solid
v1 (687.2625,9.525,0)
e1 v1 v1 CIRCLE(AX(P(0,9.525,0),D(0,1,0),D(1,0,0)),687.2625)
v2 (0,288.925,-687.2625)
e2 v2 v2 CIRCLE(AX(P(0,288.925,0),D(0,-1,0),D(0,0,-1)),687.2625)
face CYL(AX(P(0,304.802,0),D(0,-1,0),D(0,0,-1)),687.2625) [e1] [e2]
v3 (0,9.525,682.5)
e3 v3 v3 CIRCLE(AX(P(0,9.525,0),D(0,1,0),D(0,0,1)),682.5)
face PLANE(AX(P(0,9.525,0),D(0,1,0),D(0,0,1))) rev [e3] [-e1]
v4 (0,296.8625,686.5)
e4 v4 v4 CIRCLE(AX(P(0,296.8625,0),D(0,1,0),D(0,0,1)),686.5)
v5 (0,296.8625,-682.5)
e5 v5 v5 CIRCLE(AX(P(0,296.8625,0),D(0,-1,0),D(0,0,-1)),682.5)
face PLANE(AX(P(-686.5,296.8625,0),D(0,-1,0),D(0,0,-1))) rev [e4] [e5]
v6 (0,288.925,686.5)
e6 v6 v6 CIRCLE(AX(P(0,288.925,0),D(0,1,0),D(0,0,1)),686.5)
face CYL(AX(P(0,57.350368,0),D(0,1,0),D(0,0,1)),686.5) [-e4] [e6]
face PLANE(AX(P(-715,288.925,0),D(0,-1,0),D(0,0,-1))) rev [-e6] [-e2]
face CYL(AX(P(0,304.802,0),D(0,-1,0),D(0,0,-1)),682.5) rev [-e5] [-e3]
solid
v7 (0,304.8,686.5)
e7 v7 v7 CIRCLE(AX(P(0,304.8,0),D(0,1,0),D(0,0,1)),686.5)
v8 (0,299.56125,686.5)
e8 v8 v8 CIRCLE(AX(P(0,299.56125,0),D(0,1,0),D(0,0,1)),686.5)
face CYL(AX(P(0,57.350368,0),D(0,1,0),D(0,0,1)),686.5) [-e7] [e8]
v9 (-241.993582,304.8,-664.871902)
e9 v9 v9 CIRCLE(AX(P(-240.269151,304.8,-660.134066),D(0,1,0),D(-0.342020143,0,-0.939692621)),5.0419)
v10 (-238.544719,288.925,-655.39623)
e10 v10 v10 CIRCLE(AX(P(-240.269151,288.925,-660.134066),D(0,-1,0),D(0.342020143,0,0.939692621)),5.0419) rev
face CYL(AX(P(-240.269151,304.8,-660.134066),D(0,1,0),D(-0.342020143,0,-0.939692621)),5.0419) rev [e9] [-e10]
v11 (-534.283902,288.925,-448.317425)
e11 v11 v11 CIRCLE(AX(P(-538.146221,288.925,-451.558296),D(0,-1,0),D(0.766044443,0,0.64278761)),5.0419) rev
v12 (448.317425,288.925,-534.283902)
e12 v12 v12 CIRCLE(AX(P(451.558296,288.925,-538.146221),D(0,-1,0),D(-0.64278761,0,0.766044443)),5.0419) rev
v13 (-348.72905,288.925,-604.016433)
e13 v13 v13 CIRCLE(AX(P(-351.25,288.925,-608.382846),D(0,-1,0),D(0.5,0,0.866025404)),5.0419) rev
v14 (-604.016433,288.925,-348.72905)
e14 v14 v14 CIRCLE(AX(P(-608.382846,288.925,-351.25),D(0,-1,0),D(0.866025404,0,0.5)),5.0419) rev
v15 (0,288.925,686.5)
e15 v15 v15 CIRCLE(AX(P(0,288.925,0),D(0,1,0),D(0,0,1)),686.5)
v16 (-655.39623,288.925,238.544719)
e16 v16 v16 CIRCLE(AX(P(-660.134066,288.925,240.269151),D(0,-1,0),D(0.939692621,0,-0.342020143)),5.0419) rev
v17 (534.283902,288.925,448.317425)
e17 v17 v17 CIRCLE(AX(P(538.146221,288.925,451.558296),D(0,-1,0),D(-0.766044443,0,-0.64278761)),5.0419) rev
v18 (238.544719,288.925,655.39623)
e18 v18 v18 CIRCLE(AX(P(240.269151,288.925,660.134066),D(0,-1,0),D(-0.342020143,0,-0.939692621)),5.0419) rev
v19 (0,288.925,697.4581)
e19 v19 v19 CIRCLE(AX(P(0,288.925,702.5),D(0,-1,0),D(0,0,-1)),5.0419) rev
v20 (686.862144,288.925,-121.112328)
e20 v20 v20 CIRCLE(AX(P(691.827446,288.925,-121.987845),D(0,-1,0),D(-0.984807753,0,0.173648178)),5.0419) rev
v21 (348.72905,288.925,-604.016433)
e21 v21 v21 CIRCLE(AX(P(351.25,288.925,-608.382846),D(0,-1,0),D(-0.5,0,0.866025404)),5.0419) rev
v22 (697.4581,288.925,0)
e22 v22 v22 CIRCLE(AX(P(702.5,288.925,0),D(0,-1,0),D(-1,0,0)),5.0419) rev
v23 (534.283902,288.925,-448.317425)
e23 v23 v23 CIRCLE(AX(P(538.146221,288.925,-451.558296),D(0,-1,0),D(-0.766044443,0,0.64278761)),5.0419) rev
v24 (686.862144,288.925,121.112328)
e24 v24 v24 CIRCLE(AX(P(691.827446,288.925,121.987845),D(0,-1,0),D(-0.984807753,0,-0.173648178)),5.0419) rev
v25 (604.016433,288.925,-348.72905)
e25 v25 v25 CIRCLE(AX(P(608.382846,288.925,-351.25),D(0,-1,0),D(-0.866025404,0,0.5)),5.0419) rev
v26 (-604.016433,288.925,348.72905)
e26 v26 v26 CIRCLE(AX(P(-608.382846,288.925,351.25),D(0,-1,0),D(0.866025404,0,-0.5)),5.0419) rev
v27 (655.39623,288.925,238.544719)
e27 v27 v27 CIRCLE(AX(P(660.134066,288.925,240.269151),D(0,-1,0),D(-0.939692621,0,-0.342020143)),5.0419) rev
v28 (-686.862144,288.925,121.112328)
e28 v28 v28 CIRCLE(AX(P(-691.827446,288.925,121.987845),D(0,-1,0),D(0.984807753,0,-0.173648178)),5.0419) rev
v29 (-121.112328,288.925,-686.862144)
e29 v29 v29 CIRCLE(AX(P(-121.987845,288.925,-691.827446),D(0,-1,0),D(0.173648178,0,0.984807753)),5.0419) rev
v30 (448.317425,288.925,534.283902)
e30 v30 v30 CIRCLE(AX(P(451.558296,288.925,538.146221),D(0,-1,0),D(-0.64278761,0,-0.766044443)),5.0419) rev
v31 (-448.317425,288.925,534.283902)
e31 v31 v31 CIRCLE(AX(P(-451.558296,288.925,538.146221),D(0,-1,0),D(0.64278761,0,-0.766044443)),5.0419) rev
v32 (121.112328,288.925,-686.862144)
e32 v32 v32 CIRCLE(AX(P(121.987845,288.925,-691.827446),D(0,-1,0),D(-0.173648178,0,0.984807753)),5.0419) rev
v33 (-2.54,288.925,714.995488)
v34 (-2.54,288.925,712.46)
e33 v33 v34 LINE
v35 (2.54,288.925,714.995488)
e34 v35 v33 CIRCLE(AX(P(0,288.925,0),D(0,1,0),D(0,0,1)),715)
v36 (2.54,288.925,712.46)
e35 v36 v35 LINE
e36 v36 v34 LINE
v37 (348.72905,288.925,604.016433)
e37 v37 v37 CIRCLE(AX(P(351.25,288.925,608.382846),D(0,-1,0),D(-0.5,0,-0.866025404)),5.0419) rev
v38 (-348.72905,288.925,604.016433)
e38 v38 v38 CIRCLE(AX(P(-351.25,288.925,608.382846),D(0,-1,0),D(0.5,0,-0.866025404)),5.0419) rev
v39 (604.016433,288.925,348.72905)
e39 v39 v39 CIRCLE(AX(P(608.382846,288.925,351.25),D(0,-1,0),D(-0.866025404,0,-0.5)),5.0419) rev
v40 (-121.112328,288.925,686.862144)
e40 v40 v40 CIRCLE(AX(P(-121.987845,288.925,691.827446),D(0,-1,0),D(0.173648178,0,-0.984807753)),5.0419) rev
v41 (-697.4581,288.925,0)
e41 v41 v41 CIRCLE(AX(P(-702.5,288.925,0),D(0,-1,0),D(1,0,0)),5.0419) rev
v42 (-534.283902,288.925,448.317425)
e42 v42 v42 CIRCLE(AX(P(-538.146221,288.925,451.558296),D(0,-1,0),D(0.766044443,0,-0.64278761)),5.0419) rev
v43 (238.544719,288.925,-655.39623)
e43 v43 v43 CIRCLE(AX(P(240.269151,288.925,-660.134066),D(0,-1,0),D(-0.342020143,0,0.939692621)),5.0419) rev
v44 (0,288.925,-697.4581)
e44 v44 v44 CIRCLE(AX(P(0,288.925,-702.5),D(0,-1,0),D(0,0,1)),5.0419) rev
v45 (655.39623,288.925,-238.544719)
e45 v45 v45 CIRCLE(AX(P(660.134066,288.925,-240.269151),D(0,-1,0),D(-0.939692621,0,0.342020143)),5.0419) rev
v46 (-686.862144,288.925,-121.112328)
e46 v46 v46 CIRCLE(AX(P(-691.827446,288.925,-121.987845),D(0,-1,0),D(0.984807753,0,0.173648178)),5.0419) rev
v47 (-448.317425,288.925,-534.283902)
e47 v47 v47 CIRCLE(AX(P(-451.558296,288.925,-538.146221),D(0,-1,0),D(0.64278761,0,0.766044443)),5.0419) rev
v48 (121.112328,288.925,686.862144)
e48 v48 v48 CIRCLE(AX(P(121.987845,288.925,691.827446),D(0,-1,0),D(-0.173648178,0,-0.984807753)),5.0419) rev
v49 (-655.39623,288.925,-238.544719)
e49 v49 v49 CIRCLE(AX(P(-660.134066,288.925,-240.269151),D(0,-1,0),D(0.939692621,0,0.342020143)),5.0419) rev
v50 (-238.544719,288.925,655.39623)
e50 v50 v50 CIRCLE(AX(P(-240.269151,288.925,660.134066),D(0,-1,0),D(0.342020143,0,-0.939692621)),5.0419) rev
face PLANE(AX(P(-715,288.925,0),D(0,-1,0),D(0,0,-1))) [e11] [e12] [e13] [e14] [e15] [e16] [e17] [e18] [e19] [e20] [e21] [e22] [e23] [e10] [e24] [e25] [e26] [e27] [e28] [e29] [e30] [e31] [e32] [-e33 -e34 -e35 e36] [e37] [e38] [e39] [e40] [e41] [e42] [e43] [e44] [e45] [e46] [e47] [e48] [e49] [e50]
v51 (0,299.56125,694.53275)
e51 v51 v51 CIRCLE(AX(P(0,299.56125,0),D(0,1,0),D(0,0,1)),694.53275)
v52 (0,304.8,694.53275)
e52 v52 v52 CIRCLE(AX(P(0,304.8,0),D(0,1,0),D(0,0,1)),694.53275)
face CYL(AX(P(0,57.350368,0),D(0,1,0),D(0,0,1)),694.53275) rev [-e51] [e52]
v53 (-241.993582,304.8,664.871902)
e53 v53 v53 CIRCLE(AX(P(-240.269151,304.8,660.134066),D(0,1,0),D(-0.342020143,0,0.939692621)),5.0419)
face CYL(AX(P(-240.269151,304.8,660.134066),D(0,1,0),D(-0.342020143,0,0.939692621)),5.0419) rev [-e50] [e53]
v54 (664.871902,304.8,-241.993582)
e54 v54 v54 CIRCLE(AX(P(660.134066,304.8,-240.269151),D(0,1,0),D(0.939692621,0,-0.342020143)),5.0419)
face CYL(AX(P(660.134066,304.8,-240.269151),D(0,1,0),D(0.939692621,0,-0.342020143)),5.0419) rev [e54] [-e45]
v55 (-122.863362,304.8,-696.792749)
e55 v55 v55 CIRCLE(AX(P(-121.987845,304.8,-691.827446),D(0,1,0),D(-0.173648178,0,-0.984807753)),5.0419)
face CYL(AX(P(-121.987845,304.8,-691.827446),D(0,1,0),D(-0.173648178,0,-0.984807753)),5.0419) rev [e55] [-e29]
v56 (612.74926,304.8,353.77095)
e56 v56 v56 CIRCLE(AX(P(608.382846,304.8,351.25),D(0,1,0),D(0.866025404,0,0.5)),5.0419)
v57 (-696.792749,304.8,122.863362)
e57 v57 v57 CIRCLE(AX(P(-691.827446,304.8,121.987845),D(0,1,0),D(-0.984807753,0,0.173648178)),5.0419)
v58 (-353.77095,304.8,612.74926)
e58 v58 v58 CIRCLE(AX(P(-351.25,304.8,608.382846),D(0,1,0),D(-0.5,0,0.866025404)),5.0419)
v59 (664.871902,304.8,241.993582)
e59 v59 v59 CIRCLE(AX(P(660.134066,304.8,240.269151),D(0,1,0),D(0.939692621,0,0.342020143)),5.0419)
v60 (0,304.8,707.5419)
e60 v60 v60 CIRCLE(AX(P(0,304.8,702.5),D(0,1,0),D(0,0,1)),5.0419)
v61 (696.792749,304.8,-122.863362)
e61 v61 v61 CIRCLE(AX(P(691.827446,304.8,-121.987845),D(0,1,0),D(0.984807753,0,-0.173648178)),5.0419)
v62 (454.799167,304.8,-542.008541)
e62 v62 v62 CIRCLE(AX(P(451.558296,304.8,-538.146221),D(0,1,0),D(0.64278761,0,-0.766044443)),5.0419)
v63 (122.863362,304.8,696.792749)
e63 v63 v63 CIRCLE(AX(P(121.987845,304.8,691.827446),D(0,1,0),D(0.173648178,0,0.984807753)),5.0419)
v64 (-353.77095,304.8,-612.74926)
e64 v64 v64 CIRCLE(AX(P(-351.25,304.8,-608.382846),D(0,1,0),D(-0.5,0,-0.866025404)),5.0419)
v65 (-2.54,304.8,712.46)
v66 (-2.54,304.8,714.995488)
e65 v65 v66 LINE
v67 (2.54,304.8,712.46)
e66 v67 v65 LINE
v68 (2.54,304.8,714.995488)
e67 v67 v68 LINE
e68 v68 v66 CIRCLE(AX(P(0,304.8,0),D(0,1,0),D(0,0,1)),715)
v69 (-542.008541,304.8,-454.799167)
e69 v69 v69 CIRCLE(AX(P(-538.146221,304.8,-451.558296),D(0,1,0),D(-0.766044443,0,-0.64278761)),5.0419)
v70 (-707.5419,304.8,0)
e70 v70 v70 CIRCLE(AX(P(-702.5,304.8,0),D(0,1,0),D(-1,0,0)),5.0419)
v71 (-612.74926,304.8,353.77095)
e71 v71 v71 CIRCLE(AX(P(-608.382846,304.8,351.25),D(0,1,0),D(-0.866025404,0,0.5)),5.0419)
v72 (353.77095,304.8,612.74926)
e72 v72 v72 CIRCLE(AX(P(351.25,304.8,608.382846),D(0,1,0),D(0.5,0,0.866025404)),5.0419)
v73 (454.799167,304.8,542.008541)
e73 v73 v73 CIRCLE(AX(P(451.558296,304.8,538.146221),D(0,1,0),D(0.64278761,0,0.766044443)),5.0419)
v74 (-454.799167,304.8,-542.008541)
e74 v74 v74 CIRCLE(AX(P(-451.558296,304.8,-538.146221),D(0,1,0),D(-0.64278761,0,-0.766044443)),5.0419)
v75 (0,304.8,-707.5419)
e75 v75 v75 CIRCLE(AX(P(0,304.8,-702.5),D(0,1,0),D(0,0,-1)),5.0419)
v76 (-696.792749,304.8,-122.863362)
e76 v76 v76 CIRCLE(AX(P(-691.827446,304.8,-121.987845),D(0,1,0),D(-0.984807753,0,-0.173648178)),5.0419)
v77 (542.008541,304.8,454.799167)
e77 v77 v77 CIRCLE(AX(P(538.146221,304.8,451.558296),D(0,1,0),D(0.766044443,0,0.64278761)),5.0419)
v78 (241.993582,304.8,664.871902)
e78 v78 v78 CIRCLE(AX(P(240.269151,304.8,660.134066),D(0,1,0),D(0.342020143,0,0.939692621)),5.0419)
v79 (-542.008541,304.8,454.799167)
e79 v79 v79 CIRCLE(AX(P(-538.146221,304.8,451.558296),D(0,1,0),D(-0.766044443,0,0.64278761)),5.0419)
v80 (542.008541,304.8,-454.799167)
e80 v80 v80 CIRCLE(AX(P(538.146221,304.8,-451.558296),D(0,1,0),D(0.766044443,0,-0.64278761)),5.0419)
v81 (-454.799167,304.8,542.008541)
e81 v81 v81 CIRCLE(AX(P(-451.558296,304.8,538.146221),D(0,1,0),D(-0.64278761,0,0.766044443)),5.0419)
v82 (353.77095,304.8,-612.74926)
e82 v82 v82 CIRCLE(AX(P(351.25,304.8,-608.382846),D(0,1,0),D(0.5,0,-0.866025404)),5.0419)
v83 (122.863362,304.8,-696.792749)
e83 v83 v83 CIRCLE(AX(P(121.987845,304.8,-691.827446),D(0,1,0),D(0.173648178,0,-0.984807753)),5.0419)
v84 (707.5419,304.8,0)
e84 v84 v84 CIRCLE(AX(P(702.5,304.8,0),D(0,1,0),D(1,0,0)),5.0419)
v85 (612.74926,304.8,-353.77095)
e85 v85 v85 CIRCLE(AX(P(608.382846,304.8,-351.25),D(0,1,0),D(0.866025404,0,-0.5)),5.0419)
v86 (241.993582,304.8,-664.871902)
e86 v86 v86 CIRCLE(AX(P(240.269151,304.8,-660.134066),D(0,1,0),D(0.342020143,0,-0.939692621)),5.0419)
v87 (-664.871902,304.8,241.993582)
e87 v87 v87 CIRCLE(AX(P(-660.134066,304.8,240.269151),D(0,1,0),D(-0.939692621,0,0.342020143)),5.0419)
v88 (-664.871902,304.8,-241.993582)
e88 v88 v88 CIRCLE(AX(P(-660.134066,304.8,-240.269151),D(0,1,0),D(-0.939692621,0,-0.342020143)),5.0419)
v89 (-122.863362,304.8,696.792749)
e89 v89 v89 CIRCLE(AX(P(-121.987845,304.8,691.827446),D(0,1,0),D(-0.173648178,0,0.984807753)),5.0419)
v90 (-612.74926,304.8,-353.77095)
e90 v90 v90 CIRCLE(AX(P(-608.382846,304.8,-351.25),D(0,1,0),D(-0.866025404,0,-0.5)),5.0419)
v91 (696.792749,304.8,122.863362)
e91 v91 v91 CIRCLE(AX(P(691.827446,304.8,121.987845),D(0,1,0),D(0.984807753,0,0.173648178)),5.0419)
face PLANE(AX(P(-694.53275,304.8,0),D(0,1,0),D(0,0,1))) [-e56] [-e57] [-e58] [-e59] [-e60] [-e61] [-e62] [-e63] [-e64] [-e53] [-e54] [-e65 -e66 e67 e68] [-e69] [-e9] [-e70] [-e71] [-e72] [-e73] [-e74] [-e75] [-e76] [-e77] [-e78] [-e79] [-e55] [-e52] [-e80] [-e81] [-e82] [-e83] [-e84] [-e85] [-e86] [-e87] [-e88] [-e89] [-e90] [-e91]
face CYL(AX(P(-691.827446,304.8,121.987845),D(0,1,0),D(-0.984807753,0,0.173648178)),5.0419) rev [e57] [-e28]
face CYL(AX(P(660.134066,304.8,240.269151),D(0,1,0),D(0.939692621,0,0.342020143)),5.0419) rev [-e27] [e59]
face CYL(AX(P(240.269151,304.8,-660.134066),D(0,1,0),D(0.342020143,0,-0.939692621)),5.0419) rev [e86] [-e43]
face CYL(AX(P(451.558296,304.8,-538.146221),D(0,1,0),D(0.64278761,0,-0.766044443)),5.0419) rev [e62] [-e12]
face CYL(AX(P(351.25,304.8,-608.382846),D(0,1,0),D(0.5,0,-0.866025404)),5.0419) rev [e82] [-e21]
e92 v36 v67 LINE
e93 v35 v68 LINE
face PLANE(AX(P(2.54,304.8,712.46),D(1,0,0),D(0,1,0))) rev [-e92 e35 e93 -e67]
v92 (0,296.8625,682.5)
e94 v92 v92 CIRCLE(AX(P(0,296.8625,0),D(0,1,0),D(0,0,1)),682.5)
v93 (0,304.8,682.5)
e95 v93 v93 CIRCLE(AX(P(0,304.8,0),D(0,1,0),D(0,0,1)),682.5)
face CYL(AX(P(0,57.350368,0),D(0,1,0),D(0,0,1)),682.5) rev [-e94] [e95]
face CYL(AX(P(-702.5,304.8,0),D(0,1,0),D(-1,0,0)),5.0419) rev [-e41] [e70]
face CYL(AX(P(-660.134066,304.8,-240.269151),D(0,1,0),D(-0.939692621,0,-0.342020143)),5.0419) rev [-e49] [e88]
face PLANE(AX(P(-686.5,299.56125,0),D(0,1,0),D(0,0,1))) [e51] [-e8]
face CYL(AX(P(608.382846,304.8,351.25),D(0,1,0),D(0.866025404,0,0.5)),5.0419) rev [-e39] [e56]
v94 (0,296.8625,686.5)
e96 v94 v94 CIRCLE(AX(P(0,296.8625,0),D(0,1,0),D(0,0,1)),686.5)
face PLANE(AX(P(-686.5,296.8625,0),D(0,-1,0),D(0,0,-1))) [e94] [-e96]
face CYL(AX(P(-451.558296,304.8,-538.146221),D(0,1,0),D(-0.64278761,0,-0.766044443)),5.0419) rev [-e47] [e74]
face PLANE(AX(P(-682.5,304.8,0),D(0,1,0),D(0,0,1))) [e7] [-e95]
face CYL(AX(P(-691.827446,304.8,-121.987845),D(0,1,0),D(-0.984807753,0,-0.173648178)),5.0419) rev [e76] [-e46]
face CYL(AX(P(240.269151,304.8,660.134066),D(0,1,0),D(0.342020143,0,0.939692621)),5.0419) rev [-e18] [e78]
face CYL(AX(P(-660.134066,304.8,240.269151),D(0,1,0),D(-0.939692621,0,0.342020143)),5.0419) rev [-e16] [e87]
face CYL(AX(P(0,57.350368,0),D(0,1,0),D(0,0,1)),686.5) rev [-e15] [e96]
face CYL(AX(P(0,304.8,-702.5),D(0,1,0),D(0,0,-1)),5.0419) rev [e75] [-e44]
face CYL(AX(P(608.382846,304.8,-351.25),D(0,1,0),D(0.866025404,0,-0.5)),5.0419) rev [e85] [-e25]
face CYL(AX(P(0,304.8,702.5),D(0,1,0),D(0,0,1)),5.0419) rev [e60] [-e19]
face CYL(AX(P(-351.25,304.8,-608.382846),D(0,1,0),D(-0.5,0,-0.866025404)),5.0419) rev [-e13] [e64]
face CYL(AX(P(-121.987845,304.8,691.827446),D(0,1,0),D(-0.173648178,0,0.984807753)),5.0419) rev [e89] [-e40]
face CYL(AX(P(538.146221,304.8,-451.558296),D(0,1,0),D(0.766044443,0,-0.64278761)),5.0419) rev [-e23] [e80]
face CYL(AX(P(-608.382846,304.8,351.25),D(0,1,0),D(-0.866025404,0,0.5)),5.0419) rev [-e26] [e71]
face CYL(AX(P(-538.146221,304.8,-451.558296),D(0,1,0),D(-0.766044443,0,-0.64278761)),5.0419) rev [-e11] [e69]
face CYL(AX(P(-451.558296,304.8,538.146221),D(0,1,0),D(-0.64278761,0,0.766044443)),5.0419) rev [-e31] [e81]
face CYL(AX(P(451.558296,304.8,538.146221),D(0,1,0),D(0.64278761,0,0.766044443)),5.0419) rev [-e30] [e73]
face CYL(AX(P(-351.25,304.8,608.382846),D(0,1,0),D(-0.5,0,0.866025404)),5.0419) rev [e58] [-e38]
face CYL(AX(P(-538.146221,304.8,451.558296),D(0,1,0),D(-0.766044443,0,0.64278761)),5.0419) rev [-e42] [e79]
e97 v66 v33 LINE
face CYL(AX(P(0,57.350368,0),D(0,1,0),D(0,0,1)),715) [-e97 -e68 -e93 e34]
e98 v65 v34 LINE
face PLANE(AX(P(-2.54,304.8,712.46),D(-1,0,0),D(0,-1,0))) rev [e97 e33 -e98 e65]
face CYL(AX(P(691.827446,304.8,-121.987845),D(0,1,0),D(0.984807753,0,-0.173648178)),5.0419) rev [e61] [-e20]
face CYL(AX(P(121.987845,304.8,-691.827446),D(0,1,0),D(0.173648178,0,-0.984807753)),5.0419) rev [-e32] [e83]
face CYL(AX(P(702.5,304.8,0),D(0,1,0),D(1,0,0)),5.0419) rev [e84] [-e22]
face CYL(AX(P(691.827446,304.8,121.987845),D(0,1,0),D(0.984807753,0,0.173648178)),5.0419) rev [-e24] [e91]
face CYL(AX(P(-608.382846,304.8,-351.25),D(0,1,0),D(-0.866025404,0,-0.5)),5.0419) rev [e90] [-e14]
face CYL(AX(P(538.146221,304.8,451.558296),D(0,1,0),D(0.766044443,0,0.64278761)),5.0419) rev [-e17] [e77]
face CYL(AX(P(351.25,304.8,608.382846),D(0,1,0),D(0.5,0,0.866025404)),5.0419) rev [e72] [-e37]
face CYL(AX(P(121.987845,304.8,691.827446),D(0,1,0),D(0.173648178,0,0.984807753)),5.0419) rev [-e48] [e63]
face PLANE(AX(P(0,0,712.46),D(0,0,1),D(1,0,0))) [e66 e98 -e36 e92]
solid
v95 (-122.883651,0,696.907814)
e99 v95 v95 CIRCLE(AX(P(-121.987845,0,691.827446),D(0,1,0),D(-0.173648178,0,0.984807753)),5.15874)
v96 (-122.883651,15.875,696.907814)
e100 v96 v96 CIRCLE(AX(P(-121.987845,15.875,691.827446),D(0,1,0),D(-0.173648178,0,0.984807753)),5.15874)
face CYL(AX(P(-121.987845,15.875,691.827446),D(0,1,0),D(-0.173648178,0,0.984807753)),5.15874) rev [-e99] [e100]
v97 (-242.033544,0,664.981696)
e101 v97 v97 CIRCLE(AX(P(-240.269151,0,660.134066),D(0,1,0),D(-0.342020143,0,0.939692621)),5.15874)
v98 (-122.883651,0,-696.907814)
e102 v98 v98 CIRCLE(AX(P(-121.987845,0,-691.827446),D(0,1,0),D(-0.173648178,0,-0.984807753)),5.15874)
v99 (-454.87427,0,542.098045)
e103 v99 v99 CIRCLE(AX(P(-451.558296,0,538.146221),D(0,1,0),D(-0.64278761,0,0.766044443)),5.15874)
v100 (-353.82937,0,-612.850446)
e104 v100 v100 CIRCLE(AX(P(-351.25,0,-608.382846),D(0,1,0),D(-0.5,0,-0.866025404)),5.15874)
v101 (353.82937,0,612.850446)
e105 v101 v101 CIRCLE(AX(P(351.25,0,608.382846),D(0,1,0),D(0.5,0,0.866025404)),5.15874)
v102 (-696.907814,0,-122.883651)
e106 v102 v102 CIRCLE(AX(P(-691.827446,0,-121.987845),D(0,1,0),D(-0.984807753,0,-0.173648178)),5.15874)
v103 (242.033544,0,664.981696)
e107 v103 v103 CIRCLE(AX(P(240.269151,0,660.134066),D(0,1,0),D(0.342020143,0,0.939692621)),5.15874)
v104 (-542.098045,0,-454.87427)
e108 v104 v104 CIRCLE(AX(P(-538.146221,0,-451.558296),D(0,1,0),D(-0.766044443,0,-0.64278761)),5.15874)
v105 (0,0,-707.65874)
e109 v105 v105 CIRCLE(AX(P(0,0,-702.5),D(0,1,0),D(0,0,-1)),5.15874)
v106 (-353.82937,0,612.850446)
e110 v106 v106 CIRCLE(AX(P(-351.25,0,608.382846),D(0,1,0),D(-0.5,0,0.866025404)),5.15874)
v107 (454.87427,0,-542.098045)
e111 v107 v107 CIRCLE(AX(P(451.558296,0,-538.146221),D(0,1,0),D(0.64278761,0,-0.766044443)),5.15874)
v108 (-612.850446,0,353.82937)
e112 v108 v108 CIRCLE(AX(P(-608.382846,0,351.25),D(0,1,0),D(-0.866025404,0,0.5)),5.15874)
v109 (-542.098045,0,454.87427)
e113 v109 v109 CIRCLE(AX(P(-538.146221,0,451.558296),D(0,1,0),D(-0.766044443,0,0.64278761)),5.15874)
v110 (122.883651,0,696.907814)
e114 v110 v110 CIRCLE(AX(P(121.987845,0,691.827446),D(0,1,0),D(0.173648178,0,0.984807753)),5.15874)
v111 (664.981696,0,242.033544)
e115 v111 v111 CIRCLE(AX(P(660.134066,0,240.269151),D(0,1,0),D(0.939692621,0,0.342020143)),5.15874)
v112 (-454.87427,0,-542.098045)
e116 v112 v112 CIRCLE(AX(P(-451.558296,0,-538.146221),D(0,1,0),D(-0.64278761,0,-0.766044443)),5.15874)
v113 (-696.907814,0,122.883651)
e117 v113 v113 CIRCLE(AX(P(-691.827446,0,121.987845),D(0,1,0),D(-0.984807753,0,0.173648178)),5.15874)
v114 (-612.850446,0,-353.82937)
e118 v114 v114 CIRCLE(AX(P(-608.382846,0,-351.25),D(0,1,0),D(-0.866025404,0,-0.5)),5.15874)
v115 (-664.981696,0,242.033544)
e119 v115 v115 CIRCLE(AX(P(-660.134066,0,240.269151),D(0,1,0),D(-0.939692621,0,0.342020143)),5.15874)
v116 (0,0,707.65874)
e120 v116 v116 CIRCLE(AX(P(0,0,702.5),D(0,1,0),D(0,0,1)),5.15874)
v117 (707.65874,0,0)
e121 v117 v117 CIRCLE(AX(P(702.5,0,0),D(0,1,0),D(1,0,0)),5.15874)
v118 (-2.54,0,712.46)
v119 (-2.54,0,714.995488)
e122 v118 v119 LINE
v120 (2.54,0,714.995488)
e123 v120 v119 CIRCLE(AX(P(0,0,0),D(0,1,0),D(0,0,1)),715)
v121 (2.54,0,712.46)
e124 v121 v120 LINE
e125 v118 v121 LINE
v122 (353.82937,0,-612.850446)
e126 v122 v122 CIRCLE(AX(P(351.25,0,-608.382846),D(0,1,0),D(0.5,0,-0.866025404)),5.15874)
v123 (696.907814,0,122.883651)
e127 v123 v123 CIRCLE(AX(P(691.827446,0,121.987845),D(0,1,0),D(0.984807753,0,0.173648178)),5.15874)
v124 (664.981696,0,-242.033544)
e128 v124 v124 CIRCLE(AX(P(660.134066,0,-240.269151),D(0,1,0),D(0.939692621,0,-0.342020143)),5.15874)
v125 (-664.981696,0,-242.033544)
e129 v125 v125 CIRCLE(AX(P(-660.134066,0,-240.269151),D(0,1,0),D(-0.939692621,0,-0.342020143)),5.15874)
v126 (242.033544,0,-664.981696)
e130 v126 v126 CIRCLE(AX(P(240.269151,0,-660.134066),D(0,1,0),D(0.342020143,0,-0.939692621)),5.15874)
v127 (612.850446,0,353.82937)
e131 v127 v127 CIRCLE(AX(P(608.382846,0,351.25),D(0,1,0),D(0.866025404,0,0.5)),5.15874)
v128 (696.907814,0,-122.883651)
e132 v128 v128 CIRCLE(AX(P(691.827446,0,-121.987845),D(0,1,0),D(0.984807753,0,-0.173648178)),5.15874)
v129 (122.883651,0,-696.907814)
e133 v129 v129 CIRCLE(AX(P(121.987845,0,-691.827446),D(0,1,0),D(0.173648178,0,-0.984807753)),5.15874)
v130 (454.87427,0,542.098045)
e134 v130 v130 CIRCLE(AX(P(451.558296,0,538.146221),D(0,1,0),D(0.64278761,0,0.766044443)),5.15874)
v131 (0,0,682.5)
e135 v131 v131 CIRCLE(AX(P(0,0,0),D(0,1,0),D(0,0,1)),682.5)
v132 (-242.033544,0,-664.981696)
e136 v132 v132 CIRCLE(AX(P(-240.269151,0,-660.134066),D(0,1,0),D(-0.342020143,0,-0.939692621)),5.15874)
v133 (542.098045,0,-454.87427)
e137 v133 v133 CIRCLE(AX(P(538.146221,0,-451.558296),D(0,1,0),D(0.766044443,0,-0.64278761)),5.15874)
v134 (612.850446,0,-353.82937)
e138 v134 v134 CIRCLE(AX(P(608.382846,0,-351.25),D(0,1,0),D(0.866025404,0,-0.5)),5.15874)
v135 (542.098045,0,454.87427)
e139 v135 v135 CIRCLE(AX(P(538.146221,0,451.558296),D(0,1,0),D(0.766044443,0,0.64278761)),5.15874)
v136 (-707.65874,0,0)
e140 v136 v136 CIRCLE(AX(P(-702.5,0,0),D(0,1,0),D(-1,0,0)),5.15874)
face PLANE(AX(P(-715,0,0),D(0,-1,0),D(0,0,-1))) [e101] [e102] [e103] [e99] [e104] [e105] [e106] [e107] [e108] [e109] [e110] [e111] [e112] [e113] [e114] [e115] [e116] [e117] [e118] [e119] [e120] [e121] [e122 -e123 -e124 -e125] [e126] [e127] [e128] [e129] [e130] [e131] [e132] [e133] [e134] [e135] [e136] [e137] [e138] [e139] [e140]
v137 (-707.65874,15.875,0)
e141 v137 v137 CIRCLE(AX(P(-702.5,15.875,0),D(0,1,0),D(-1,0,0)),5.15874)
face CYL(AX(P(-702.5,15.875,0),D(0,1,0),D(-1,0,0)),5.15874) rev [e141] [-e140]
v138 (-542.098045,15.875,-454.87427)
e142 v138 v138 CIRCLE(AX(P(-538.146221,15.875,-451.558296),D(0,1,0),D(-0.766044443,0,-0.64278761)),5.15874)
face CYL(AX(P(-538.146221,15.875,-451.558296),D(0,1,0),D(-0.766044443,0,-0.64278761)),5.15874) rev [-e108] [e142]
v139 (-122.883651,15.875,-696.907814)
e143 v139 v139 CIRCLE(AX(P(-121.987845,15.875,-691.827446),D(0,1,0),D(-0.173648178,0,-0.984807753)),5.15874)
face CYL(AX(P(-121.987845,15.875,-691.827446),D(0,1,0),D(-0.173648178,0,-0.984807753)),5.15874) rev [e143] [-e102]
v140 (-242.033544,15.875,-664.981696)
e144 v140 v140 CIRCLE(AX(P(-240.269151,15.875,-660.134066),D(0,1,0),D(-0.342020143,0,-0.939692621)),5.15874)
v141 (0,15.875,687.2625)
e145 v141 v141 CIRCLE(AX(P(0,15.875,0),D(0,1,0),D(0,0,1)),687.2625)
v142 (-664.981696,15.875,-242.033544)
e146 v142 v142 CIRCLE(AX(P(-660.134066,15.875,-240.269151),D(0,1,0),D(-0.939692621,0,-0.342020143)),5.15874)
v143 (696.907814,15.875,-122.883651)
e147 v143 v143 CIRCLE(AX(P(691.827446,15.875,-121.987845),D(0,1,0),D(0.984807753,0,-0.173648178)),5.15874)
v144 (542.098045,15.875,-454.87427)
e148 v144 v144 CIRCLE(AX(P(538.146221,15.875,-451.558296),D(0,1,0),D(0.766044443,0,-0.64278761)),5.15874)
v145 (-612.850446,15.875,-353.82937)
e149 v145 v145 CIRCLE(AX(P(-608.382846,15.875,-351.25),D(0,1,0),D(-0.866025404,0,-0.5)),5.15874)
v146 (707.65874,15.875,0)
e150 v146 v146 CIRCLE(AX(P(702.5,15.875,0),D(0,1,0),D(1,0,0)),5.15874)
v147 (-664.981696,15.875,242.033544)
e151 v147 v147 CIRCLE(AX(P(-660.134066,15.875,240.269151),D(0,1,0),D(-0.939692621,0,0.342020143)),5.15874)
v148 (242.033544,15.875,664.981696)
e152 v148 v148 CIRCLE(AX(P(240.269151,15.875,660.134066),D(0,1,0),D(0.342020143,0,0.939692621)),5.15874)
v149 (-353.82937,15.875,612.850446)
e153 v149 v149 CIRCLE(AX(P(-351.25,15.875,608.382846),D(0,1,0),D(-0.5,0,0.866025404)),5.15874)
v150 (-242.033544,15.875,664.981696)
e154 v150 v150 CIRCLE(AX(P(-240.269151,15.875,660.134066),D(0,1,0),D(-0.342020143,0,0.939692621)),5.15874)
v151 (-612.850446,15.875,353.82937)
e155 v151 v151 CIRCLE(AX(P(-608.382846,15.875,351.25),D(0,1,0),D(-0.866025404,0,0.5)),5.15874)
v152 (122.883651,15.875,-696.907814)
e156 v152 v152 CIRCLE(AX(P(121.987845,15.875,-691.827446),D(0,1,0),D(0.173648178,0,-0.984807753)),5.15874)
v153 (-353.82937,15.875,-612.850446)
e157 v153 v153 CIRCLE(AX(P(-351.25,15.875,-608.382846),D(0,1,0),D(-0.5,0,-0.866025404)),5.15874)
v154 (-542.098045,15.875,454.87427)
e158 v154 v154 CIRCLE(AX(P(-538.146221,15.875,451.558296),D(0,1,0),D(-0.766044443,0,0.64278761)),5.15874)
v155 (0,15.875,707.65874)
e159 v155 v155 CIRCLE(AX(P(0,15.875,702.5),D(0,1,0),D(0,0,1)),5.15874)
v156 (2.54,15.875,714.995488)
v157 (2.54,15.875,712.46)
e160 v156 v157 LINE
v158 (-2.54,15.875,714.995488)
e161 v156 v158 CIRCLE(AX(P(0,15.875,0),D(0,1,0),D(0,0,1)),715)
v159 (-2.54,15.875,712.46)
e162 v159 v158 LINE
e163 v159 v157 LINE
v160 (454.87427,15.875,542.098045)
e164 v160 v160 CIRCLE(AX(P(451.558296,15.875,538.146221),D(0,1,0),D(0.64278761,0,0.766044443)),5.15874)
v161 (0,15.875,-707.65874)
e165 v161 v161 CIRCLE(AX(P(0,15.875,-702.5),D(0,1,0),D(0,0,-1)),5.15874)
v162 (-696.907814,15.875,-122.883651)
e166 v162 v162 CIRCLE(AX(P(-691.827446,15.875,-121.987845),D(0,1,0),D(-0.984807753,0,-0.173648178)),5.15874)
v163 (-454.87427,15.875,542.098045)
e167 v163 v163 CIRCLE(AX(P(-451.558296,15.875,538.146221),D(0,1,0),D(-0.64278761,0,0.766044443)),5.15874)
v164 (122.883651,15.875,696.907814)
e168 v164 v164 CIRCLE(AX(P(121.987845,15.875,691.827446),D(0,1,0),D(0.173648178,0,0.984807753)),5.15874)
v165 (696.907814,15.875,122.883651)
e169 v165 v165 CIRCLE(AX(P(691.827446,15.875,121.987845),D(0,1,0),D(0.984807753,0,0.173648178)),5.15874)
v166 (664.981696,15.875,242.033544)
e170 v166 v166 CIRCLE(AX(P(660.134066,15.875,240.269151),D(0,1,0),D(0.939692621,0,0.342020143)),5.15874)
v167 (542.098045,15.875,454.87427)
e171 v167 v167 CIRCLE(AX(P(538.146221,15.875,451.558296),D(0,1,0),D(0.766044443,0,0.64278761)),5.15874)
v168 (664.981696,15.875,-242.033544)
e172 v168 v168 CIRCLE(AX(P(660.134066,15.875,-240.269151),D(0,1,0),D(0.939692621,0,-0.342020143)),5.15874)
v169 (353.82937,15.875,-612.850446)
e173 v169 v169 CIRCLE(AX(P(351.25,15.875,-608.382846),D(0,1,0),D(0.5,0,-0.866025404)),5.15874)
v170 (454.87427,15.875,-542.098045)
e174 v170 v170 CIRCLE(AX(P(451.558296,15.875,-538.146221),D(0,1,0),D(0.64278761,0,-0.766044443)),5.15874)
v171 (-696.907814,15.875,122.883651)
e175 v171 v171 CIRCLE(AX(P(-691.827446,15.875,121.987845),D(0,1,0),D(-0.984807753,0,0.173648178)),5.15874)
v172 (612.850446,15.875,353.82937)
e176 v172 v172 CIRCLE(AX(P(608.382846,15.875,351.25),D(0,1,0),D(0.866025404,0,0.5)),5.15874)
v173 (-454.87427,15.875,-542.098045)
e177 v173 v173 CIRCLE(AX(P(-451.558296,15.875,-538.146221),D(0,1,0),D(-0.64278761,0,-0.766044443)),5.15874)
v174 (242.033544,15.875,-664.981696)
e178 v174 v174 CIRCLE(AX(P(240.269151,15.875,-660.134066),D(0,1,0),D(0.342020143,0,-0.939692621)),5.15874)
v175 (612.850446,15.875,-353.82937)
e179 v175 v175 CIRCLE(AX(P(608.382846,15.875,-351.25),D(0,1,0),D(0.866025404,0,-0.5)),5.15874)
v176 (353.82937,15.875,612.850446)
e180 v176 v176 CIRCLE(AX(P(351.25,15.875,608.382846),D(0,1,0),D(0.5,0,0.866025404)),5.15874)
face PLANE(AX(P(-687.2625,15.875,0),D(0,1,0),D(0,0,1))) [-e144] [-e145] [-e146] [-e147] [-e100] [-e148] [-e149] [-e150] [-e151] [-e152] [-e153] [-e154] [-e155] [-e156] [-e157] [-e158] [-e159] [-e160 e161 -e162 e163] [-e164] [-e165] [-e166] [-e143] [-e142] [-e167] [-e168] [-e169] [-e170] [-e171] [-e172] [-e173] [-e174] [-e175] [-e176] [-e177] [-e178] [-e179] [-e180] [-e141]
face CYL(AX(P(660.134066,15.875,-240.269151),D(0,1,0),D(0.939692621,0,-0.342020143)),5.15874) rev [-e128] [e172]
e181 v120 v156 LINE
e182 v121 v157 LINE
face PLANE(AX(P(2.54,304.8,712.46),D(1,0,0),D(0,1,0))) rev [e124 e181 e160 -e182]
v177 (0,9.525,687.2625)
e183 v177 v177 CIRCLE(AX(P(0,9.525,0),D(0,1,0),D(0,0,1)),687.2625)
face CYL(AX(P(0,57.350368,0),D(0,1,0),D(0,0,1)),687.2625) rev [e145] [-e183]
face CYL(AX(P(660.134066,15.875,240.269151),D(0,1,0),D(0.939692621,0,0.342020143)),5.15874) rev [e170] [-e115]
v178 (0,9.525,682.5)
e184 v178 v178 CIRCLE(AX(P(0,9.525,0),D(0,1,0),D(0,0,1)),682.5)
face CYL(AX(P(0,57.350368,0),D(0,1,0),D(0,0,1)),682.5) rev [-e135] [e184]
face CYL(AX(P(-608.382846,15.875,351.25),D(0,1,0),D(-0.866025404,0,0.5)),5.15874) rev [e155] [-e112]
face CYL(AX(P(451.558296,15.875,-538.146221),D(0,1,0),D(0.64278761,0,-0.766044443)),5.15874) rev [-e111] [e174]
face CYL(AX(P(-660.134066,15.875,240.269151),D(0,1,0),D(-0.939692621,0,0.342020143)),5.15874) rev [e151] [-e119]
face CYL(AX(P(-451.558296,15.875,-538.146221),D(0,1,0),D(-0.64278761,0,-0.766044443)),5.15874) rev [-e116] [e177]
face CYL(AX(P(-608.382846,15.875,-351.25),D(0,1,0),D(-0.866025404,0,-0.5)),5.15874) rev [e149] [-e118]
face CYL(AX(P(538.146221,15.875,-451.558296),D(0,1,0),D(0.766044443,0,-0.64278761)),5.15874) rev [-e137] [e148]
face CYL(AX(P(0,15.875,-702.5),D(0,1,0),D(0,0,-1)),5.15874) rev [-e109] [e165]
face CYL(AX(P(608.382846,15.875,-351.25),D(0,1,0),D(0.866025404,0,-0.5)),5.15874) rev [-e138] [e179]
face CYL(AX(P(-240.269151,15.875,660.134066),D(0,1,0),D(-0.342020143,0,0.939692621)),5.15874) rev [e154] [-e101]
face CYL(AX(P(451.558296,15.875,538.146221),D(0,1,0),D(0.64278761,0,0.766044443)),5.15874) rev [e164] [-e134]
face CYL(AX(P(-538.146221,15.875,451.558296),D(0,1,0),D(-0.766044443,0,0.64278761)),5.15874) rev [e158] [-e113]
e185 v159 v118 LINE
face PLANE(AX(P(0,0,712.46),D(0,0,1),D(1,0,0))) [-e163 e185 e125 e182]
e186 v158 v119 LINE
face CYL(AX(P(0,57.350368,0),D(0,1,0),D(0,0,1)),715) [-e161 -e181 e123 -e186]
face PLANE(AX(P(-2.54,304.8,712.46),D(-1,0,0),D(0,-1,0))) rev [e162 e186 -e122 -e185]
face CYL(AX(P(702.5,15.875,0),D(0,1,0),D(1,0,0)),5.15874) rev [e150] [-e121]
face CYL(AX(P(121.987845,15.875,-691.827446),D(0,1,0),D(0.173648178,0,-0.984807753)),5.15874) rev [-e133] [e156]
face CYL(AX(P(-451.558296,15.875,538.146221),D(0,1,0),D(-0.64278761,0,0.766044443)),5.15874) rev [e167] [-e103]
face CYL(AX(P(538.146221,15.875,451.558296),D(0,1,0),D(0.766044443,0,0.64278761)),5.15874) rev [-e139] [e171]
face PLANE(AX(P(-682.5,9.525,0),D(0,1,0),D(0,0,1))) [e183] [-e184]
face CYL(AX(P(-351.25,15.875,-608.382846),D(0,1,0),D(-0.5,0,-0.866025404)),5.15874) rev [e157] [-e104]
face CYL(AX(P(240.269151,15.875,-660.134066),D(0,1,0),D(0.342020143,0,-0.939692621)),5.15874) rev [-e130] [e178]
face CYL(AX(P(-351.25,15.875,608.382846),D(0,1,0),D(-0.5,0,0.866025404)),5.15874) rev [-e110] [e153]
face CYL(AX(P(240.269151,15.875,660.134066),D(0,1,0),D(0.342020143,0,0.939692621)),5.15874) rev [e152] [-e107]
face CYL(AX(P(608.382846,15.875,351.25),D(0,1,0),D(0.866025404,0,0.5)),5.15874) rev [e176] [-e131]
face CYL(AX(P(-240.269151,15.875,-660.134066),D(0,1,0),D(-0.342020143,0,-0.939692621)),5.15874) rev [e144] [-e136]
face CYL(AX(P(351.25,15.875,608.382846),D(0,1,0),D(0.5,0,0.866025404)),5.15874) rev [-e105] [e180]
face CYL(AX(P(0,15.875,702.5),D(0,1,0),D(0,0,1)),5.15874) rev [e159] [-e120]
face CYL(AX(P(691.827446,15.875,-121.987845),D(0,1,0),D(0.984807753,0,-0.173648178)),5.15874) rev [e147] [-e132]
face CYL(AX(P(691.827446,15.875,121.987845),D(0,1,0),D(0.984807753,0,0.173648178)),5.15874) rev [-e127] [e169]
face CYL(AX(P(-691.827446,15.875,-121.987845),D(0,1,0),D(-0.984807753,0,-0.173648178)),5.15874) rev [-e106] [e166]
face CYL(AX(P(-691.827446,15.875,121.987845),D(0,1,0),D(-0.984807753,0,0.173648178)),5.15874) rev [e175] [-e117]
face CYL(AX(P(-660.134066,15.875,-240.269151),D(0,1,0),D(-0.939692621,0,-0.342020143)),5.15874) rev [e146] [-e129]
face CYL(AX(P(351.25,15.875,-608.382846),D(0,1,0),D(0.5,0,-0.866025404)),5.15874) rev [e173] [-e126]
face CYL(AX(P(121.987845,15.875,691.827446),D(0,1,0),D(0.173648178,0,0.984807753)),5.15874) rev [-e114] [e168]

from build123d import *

# Parameters (mm, degrees)
EXTRUDE_THIN_CYLINDER_BODY_REACH             = 1055.393
SKETCH3_R                                    = 687.26249998
SKETCH3_R_2                                  = 682.49999998
TAPPED_START                                 = 288.925
TAPPED_HOLE_FOR_3_8_16_HELICOIL_FR_2_R       = 5.0419
TAPPED_HOLE_FOR_3_8_16_HELICOIL_FROM_H_DEPTH = 15.875
SKETCH7_W                                    = 5.15874
SKETCH7_H                                    = 15.875
SKETCH8_W                                    = 5.08
SKETCH8_H                                    = 304.8
CUT_EXTRUDE_ALIGNMENT_MARK_DEPTH             = 2.54
CIRPATTERN_HOLE_PATTERN_COUNT                = 36


# Read off the part's stored shape, not the designer's step: Tapped Hole for 3/8-16 Helicoil - from HDPE Tophat
with BuildPart() as part:
    # Sketch1 → Revolve - Flange to RT Plate (revolve)
    with BuildSketch(Plane.XY, mode=Mode.PRIVATE) as revolve_flange_to_rt_plate_sk:
        Polygon((-682.49999998, 0), (-682.49999998, 9.525), (-687.26249998, 9.525), (-687.26249998, 15.875), (-715, 15.875), (-715, 0), align=None)
    revolve(revolve_flange_to_rt_plate_sk.sketch.rotate(Axis((0, 57.350368034, 0), (0, -1, 0)), 270), axis=Axis((0, 57.350368034, 0), (0, -1, 0)))

    # Sketch7 → 3/8 Clearance Hole - to RT_PF (revolve, cut)
    with BuildSketch(Plane(origin=(0, 15.875, 702.5), x_dir=(0, 0, 1), z_dir=(1, 0, 0))):
        with Locations((2.57937, 7.9375)):
            Rectangle(SKETCH7_W, SKETCH7_H)
    f_3_8_clearance_hole_to_rt_pf = revolve(axis=Axis((0, 22.225, 702.5), (0, -1, 0)), mode=Mode.SUBTRACT)


with BuildPart() as body_2:
    # Sketch2 → Revolve - Flange to HDPE (revolve)
    with BuildSketch(Plane.XY, mode=Mode.PRIVATE) as revolve_flange_to_hdpe_sk:
        Polygon((-682.5, 304.8), (-686.5, 304.8), (-686.5, 299.56125), (-694.53275, 299.56125), (-694.53275, 304.8), (-715, 304.8), (-715, 288.925), (-686.5, 288.925), (-686.5, 296.8625), (-682.5, 296.8625), align=None)
    revolve(revolve_flange_to_hdpe_sk.sketch.rotate(Axis((0, 57.350368034, 0), (0, -1, 0)), 270), axis=Axis((0, 57.350368034, 0), (0, -1, 0)))


with BuildPart() as body_3:

    # Sketch3 → Extrude-Thin - Cylinder Body (new, up to next)
    with BuildSketch(Plane(origin=(0, 9.525, 0), x_dir=(1, 0, 0), z_dir=(0, 1, 0)), mode=Mode.PRIVATE) as extrude_thin_cylinder_body_sk1:
        Circle(SKETCH3_R)
        Circle(SKETCH3_R_2, mode=Mode.SUBTRACT)
    extrude_thin_cylinder_body_tool1 = extrude(extrude_thin_cylinder_body_sk1.sketch, amount=EXTRUDE_THIN_CYLINDER_BODY_REACH, mode=Mode.PRIVATE) - body_2.part
    add(extrude_thin_cylinder_body_tool1.solids().sort_by_distance((-685.318628, 9.525, 0))[0])


with BuildPart() as body_2_1:
    add(body_2.part)

    # Tapped Hole for 3_8-16 Helicoil - fr 2 → Tapped Hole for 3/8-16 Helicoil - from HDPE Tophat (cut)
    with BuildSketch(Plane(origin=(0, 0, 0), x_dir=(1, 0, 0), z_dir=(0, 1, 0)).offset(TAPPED_START)):
        with Locations((0, -702.5)):
            Circle(TAPPED_HOLE_FOR_3_8_16_HELICOIL_FR_2_R)
    tapped_hole_for_3_8_16_helicoil_from_h = extrude(amount=TAPPED_HOLE_FOR_3_8_16_HELICOIL_FROM_H_DEPTH, mode=Mode.SUBTRACT)


with BuildPart() as cut_extrude_alignment_mark_tool:
    # Sketch8 → Cut-Extrude - Alignment Mark (new body)
    with BuildSketch(Plane.XY.offset(715)):
        with Locations((0, 152.4)):
            Rectangle(SKETCH8_W, SKETCH8_H)
    extrude(amount=-CUT_EXTRUDE_ALIGNMENT_MARK_DEPTH)


with BuildPart() as part_1:
    add(part.part)

    # Cut-Extrude - Alignment Mark: cut by cut_extrude_alignment_mark_tool
    add(cut_extrude_alignment_mark_tool.part, mode=Mode.SUBTRACT)


with BuildPart() as body_2_2:
    add(body_2_1.part)

    # Cut-Extrude - Alignment Mark: cut by cut_extrude_alignment_mark_tool
    add(cut_extrude_alignment_mark_tool.part, mode=Mode.SUBTRACT)


with BuildPart() as cirpattern_hole_pattern_tool:
    # CirPattern - Hole Pattern: Tapped Hole for 3/8-16 Helicoil - from HDPE Tophat, 3/8 Clearance Hole - to RT_PF ×36 about axis
    cirpattern_hole_pattern_axis = Axis((0, 0, 0), (0, 1, 0))
    add([tapped_hole_for_3_8_16_helicoil_from_h.rotate(cirpattern_hole_pattern_axis, i * 360 / CIRPATTERN_HOLE_PATTERN_COUNT) for i in range(1, CIRPATTERN_HOLE_PATTERN_COUNT)])
    add([f_3_8_clearance_hole_to_rt_pf.rotate(cirpattern_hole_pattern_axis, i * 360 / CIRPATTERN_HOLE_PATTERN_COUNT) for i in range(1, CIRPATTERN_HOLE_PATTERN_COUNT)])


with BuildPart() as part_2:
    add(part_1.part)

    # CirPattern - Hole Pattern: cut by cirpattern_hole_pattern_tool
    add(cirpattern_hole_pattern_tool.part, mode=Mode.SUBTRACT)


with BuildPart() as body_2_3:
    add(body_2_2.part)

    # CirPattern - Hole Pattern: cut by cirpattern_hole_pattern_tool
    add(cirpattern_hole_pattern_tool.part, mode=Mode.SUBTRACT)


solid = Compound([body_3.part, part_2.part, body_2_3.part])
